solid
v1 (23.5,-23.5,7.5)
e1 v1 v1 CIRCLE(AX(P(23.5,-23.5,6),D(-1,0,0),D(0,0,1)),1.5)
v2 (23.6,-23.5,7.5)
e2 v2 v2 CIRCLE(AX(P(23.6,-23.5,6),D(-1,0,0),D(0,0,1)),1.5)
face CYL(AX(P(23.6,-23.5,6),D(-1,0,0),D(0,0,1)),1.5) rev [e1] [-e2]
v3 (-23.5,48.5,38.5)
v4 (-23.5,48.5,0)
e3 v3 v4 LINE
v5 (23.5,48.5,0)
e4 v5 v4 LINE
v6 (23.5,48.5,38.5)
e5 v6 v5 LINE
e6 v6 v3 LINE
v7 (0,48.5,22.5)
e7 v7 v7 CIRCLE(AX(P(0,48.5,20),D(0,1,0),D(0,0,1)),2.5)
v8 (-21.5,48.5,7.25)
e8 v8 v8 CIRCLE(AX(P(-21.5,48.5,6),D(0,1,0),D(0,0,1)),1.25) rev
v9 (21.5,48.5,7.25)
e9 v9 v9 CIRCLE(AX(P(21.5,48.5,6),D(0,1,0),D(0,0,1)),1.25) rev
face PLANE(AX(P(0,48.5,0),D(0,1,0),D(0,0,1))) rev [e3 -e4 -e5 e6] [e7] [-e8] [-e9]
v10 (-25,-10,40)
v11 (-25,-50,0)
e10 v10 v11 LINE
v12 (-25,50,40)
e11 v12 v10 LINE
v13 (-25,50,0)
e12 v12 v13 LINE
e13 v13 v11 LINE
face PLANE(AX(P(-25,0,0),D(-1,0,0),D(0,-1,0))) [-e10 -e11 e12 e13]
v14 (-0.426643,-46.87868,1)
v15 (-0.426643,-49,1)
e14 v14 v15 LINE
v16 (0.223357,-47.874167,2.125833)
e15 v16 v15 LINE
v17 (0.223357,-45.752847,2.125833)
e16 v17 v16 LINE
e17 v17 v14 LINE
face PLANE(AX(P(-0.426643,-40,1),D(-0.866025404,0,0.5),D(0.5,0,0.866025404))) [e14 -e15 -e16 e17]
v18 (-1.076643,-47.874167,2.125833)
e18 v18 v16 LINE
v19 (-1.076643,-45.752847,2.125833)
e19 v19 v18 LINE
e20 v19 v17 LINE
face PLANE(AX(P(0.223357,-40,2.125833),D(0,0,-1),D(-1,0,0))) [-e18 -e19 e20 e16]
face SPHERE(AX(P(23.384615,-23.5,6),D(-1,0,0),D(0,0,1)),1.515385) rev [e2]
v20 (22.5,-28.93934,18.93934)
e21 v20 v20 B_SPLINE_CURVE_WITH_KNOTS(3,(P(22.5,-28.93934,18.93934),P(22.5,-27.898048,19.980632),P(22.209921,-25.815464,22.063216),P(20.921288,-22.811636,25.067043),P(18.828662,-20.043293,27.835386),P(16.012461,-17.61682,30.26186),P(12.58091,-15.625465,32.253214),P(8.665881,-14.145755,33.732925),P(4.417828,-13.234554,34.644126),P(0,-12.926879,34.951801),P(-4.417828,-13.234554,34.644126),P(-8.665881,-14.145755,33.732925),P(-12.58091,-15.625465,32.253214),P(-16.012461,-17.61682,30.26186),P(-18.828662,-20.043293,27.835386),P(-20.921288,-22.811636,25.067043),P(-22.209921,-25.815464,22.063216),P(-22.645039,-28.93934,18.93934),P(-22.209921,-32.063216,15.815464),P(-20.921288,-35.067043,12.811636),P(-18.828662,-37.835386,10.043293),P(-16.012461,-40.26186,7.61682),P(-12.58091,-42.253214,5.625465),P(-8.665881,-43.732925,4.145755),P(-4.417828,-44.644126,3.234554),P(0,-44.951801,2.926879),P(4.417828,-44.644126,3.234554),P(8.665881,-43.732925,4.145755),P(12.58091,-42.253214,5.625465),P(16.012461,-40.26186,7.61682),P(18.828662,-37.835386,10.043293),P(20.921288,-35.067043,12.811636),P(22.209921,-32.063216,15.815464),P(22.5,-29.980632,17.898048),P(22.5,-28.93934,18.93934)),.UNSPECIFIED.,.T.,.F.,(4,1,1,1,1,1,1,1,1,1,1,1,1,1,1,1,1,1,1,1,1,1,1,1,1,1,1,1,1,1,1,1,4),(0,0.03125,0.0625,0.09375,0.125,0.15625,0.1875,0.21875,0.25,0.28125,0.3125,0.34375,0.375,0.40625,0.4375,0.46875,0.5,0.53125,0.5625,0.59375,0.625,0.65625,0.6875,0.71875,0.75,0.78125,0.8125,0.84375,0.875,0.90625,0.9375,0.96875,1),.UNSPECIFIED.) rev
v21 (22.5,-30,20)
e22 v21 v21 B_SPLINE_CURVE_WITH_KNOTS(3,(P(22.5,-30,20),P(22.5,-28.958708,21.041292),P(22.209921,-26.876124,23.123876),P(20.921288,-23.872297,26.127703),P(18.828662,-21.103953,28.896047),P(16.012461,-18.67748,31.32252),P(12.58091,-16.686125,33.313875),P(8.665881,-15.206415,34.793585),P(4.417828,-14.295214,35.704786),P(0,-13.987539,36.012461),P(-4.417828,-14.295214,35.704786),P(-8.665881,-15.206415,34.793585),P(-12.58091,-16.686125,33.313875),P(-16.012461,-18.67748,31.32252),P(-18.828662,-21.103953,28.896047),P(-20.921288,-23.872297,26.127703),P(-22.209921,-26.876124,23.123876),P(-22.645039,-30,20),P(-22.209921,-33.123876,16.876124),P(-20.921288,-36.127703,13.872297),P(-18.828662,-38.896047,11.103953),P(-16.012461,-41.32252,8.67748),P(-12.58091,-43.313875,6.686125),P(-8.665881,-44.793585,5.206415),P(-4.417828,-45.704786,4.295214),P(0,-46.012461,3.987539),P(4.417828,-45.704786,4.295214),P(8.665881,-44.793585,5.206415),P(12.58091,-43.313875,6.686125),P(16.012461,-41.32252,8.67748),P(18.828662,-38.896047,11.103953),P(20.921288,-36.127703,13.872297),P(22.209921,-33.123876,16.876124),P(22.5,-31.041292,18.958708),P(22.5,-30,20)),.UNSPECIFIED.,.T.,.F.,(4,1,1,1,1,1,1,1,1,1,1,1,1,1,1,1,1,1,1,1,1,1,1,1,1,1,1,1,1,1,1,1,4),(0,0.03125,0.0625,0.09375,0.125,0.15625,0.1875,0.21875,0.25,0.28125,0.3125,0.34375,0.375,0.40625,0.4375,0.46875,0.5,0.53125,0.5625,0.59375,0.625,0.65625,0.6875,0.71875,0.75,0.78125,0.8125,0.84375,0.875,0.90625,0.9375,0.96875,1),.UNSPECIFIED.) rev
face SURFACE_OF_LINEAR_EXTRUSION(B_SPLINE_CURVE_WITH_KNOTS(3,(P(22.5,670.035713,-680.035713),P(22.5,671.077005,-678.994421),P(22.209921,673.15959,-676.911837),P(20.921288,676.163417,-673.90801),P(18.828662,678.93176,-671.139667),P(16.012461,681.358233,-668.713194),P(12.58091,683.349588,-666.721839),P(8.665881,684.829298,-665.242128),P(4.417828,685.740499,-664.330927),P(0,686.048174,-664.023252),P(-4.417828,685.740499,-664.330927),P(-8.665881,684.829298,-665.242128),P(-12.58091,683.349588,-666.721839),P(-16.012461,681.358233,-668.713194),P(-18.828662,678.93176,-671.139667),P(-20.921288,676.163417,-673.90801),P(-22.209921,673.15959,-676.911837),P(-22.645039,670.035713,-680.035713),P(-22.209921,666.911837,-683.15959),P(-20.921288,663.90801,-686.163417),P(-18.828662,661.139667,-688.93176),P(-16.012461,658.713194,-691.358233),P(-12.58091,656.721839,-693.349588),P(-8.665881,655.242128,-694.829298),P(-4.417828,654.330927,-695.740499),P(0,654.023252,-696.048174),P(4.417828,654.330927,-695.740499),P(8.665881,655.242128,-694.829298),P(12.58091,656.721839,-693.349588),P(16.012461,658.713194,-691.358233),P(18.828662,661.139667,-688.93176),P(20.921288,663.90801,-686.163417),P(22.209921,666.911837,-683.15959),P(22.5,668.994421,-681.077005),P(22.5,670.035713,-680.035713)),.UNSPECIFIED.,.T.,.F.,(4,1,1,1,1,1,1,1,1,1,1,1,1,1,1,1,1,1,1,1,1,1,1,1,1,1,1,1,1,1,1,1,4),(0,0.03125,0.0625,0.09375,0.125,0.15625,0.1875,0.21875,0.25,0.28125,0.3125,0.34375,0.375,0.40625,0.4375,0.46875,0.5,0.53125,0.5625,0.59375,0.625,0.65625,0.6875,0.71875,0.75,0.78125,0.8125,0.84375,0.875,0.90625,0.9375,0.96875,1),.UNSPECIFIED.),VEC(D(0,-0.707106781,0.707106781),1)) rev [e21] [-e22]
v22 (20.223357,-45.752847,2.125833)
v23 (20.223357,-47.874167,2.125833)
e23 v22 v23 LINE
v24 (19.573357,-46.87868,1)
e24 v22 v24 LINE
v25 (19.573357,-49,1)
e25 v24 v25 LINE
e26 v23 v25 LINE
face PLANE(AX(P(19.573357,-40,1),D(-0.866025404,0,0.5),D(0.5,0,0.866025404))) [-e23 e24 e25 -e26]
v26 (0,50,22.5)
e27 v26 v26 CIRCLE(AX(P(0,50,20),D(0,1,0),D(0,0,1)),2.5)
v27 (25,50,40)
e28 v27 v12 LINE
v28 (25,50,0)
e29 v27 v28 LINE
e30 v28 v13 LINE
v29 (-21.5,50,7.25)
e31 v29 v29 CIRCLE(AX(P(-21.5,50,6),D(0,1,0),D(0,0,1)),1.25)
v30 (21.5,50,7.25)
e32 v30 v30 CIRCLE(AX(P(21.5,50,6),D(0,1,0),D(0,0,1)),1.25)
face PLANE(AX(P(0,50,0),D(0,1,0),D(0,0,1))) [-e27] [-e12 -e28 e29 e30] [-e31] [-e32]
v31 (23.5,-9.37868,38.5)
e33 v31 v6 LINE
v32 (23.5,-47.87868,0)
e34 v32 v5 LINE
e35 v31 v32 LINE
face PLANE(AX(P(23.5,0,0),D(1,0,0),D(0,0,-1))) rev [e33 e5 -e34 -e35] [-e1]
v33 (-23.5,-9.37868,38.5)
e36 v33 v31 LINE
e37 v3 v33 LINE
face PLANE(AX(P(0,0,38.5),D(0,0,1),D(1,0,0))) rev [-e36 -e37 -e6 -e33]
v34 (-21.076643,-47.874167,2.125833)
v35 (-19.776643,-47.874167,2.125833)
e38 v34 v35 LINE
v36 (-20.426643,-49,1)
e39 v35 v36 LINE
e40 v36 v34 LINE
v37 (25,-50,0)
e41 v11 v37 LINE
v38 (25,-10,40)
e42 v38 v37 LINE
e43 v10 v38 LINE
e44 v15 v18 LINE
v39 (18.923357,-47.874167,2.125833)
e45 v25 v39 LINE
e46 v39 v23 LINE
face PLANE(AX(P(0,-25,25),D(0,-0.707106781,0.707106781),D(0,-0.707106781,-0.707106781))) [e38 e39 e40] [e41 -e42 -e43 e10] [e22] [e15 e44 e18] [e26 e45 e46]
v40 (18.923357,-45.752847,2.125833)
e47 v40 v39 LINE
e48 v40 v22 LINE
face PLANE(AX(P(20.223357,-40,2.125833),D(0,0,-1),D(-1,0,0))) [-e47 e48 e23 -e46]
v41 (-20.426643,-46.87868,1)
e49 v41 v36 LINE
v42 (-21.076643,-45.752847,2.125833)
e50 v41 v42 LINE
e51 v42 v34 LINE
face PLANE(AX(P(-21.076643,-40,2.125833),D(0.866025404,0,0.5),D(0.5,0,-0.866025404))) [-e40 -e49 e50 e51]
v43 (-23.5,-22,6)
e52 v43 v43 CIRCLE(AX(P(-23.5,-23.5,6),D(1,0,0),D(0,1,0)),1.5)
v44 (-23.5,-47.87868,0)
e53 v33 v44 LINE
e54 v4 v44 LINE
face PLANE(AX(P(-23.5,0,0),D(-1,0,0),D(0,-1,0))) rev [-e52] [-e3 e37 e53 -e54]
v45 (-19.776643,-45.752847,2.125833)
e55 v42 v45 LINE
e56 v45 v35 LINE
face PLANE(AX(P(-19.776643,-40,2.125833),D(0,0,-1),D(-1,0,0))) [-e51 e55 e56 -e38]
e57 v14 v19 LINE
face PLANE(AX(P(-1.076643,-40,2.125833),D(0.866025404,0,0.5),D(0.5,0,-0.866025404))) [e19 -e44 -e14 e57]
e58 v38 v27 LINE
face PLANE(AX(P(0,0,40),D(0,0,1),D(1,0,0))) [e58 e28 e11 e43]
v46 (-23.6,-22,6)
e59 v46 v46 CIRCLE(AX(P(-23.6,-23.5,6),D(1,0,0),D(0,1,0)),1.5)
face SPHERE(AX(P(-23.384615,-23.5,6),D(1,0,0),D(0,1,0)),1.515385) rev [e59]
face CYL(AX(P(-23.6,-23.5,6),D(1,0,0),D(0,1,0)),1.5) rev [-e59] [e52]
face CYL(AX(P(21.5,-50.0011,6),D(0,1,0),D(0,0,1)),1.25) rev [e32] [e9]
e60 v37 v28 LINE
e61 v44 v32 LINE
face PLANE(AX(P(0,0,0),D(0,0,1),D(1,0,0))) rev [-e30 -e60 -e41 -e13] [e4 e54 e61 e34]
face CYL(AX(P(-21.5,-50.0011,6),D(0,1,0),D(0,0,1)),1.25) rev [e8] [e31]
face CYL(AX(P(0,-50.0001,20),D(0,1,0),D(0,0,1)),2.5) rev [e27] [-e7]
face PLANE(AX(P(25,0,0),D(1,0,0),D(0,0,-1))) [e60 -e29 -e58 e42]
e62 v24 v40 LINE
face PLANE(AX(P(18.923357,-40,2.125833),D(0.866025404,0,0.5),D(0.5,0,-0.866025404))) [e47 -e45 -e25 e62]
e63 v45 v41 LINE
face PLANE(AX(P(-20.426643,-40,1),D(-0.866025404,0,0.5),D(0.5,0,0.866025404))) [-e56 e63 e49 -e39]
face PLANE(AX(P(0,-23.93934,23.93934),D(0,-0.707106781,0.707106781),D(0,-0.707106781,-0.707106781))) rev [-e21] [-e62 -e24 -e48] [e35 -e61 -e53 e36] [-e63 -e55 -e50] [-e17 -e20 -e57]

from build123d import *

# Parameters (mm, degrees)
BO_ALTMA1_T           = -1.5
MENFEZ1_START         = -35.355339059
MENFEZ1_DEPTH         = 1.5
IZIM6_R               = 2.5
KES_EKSTR_ZYON2_DEPTH = 111.566722087
KES_EKSTR_ZYON3_DEPTH = 10
IZIM9_R               = 1.5
KES_EKSTR_ZYON4_DEPTH = 0.1
KUBBE2_FACE_RADIUS    = 1.5
KUBBE2_HEIGHT         = 1.3
KES_EKSTR_ZYON5_START = -0.1
IZIM10_R              = 1.5
KES_EKSTR_ZYON5_DEPTH = 0.1
KUBBE3_FACE_RADIUS    = 1.5
KUBBE3_HEIGHT         = 1.3
KES_EKSTR_ZYON6_REACH = 112.567
IZIM11_R              = 1.25


# Read off the part's stored shape, not the designer's step: Menfez1
with BuildPart() as part:
    # Çizim2 → Loft1 section 0
    with BuildSketch(Plane.XY.offset(40)):
        with BuildLine():
            Line((-25, 50), (25, 50))
            Line((25, 50), (25, -10))
            Line((25, -10), (-25, -10))
            Line((-25, -10), (-25, 50))
        make_face()
    # Çizim1 → Loft1 section 1
    with BuildSketch(Plane.XY):
        with BuildLine():
            Line((-25, 50), (25, 50))
            Line((25, 50), (25, -50))
            Line((25, -50), (-25, -50))
            Line((-25, -50), (-25, 50))
        make_face()
    loft()

    # İç Boşaltma1
    bo_altma1_openings = [part.faces().sort_by_distance(p)[0] for p in [
        (0, 0, 0),
    ]]
    offset(amount=BO_ALTMA1_T, openings=bo_altma1_openings, kind=Kind.INTERSECTION)

    # Menfez1 outline → Menfez1 (cut)
    with BuildSketch(Plane(origin=(0, 0, 0), x_dir=(1, 0, 0), z_dir=(0, 0.707106781186547, -0.7071067811865479)).offset(MENFEZ1_START)):
        with BuildLine():
            add(Edge.make_bspline(
                [(22.5, 7.071067812), (22.5, 5.598458472), (22.209921279, 2.653239791), (20.921288378, -1.594813577), (18.828662098, -5.509841982), (16.012460892, -8.94139308), (12.580909794, -11.757594286), (8.665881389, -13.850220566), (4.417828021, -15.138853467), (0, -15.573971549), (-4.417828021, -15.138853467), (-8.665881389, -13.850220566), (-12.580909794, -11.757594286), (-16.012460892, -8.94139308), (-18.828662098, -5.509841982), (-20.921288378, -1.594813577), (-22.209921279, 2.653239791), (-22.645039361, 7.071067812), (-22.209921279, 11.488895833), (-20.921288378, 15.7369492), (-18.828662098, 19.651977606), (-16.012460892, 23.083528704), (-12.580909794, 25.89972991), (-8.665881389, 27.99235619), (-4.417828021, 29.280989091), (0, 29.716107172), (4.417828021, 29.280989091), (8.665881389, 27.99235619), (12.580909794, 25.89972991), (16.012460892, 23.083528704), (18.828662098, 19.651977606), (20.921288378, 15.7369492), (22.209921279, 11.488895833), (22.5, 8.543677152), (22.5, 7.071067812)],
                knots=[0, 0, 0, 0, 0.03125, 0.0625, 0.09375, 0.125, 0.15625, 0.1875, 0.21875, 0.25, 0.28125, 0.3125, 0.34375, 0.375, 0.40625, 0.4375, 0.46875, 0.5, 0.53125, 0.5625, 0.59375, 0.625, 0.65625, 0.6875, 0.71875, 0.75, 0.78125, 0.8125, 0.84375, 0.875, 0.90625, 0.9375, 0.96875, 1, 1, 1, 1], degree=3))
        make_face()
    extrude(amount=MENFEZ1_DEPTH, mode=Mode.SUBTRACT)

    # Çizim6 → Kes-Ekstrüzyon2 (cut, through all)
    with BuildSketch(Plane(origin=(0, 50, 0), x_dir=(1, 0, 0), z_dir=(0, 1, 0))):
        with Locations(Location((0, -20, 0), (0, 0, 270))):
            Circle(IZIM6_R)
    extrude(amount=-KES_EKSTR_ZYON2_DEPTH, mode=Mode.SUBTRACT)

    # Çizim7 → Kes-Ekstrüzyon3 (cut)
    with BuildSketch(Plane(origin=(0, -50, 0), x_dir=(1, 0, 0), z_dir=(0, 1, 0))):
        Polygon((19.573356646, -1), (20.223356646, -2.125833025), (18.923356646, -2.125833025), align=None)
        Polygon((-0.426643354, -1), (0.223356646, -2.125833025), (-1.076643354, -2.125833025), align=None)
        Polygon((-20.426643354, -1), (-19.776643354, -2.125833025), (-21.076643354, -2.125833025), align=None)
    extrude(amount=KES_EKSTR_ZYON3_DEPTH, mode=Mode.SUBTRACT)

    # Çizim9 → Kes-Ekstrüzyon4 (cut)
    with BuildSketch(Plane(origin=(-23.5, 0, 0), x_dir=(0, 0, -1), z_dir=(1, 0, 0))):
        with Locations(Location((-6, -23.5, 0), (0, 0, 90))):
            Circle(IZIM9_R)
    extrude(amount=-KES_EKSTR_ZYON4_DEPTH, mode=Mode.SUBTRACT)

    # Kubbe2: a dome of height H over a round flat face of radius A is a cap of a sphere of radius (A * A + H * H) / (2 * H)
    kubbe2_r = (KUBBE2_FACE_RADIUS * KUBBE2_FACE_RADIUS + KUBBE2_HEIGHT * KUBBE2_HEIGHT) / (2 * KUBBE2_HEIGHT)
    kubbe2_base = Plane((-23.6, -23.5, 6), z_dir=(-1, 0, 0))
    with Locations(kubbe2_base.offset(KUBBE2_HEIGHT - kubbe2_r)):
        kubbe2_ball = Sphere(kubbe2_r, mode=Mode.PRIVATE)
    add(split(kubbe2_ball, bisect_by=kubbe2_base, keep=Keep.TOP, mode=Mode.PRIVATE), mode=Mode.SUBTRACT)

    # Çizim10 → Kes-Ekstrüzyon5 (cut)
    with BuildSketch(Plane.ZY.offset(-23.5).offset(KES_EKSTR_ZYON5_START)):
        with Locations(Location((6, -23.5, 0), (0, 0, 90))):
            Circle(IZIM10_R)
    extrude(amount=KES_EKSTR_ZYON5_DEPTH, mode=Mode.SUBTRACT)

    # Kubbe3: a dome of height H over a round flat face of radius A is a cap of a sphere of radius (A * A + H * H) / (2 * H)
    kubbe3_r = (KUBBE3_FACE_RADIUS * KUBBE3_FACE_RADIUS + KUBBE3_HEIGHT * KUBBE3_HEIGHT) / (2 * KUBBE3_HEIGHT)
    kubbe3_base = Plane((23.6, -23.5, 6), z_dir=(1, 0, 0))
    with Locations(kubbe3_base.offset(KUBBE3_HEIGHT - kubbe3_r)):
        kubbe3_ball = Sphere(kubbe3_r, mode=Mode.PRIVATE)
    add(split(kubbe3_ball, bisect_by=kubbe3_base, keep=Keep.TOP, mode=Mode.PRIVATE), mode=Mode.SUBTRACT)

    # Çizim11 → Kes-Ekstrüzyon6 (cut, up to next)
    with BuildSketch(Plane(origin=(0, 50, 0), x_dir=(1, 0, 0), z_dir=(0, 1, 0)), mode=Mode.PRIVATE) as kes_ekstr_zyon6_sk1:
        with Locations(Location((21.5, -6, 0), (0, 0, 270))):
            Circle(IZIM11_R)
    kes_ekstr_zyon6_tool1 = extrude(kes_ekstr_zyon6_sk1.sketch, amount=-KES_EKSTR_ZYON6_REACH, mode=Mode.PRIVATE) & part.part
    # Çizim11 → Kes-Ekstrüzyon6 (cut, up to next)
    with BuildSketch(Plane(origin=(0, 50, 0), x_dir=(1, 0, 0), z_dir=(0, 1, 0)), mode=Mode.PRIVATE) as kes_ekstr_zyon6_sk2:
        with Locations(Location((-21.5, -6, 0), (0, 0, 270))):
            Circle(IZIM11_R)
    kes_ekstr_zyon6_tool2 = extrude(kes_ekstr_zyon6_sk2.sketch, amount=-KES_EKSTR_ZYON6_REACH, mode=Mode.PRIVATE) & part.part
    add(kes_ekstr_zyon6_tool1.solids().sort_by_distance((21.5, 50, 6))[0], mode=Mode.SUBTRACT)
    add(kes_ekstr_zyon6_tool2.solids().sort_by_distance((-21.5, 50, 6))[0], mode=Mode.SUBTRACT)


solid = part.part
